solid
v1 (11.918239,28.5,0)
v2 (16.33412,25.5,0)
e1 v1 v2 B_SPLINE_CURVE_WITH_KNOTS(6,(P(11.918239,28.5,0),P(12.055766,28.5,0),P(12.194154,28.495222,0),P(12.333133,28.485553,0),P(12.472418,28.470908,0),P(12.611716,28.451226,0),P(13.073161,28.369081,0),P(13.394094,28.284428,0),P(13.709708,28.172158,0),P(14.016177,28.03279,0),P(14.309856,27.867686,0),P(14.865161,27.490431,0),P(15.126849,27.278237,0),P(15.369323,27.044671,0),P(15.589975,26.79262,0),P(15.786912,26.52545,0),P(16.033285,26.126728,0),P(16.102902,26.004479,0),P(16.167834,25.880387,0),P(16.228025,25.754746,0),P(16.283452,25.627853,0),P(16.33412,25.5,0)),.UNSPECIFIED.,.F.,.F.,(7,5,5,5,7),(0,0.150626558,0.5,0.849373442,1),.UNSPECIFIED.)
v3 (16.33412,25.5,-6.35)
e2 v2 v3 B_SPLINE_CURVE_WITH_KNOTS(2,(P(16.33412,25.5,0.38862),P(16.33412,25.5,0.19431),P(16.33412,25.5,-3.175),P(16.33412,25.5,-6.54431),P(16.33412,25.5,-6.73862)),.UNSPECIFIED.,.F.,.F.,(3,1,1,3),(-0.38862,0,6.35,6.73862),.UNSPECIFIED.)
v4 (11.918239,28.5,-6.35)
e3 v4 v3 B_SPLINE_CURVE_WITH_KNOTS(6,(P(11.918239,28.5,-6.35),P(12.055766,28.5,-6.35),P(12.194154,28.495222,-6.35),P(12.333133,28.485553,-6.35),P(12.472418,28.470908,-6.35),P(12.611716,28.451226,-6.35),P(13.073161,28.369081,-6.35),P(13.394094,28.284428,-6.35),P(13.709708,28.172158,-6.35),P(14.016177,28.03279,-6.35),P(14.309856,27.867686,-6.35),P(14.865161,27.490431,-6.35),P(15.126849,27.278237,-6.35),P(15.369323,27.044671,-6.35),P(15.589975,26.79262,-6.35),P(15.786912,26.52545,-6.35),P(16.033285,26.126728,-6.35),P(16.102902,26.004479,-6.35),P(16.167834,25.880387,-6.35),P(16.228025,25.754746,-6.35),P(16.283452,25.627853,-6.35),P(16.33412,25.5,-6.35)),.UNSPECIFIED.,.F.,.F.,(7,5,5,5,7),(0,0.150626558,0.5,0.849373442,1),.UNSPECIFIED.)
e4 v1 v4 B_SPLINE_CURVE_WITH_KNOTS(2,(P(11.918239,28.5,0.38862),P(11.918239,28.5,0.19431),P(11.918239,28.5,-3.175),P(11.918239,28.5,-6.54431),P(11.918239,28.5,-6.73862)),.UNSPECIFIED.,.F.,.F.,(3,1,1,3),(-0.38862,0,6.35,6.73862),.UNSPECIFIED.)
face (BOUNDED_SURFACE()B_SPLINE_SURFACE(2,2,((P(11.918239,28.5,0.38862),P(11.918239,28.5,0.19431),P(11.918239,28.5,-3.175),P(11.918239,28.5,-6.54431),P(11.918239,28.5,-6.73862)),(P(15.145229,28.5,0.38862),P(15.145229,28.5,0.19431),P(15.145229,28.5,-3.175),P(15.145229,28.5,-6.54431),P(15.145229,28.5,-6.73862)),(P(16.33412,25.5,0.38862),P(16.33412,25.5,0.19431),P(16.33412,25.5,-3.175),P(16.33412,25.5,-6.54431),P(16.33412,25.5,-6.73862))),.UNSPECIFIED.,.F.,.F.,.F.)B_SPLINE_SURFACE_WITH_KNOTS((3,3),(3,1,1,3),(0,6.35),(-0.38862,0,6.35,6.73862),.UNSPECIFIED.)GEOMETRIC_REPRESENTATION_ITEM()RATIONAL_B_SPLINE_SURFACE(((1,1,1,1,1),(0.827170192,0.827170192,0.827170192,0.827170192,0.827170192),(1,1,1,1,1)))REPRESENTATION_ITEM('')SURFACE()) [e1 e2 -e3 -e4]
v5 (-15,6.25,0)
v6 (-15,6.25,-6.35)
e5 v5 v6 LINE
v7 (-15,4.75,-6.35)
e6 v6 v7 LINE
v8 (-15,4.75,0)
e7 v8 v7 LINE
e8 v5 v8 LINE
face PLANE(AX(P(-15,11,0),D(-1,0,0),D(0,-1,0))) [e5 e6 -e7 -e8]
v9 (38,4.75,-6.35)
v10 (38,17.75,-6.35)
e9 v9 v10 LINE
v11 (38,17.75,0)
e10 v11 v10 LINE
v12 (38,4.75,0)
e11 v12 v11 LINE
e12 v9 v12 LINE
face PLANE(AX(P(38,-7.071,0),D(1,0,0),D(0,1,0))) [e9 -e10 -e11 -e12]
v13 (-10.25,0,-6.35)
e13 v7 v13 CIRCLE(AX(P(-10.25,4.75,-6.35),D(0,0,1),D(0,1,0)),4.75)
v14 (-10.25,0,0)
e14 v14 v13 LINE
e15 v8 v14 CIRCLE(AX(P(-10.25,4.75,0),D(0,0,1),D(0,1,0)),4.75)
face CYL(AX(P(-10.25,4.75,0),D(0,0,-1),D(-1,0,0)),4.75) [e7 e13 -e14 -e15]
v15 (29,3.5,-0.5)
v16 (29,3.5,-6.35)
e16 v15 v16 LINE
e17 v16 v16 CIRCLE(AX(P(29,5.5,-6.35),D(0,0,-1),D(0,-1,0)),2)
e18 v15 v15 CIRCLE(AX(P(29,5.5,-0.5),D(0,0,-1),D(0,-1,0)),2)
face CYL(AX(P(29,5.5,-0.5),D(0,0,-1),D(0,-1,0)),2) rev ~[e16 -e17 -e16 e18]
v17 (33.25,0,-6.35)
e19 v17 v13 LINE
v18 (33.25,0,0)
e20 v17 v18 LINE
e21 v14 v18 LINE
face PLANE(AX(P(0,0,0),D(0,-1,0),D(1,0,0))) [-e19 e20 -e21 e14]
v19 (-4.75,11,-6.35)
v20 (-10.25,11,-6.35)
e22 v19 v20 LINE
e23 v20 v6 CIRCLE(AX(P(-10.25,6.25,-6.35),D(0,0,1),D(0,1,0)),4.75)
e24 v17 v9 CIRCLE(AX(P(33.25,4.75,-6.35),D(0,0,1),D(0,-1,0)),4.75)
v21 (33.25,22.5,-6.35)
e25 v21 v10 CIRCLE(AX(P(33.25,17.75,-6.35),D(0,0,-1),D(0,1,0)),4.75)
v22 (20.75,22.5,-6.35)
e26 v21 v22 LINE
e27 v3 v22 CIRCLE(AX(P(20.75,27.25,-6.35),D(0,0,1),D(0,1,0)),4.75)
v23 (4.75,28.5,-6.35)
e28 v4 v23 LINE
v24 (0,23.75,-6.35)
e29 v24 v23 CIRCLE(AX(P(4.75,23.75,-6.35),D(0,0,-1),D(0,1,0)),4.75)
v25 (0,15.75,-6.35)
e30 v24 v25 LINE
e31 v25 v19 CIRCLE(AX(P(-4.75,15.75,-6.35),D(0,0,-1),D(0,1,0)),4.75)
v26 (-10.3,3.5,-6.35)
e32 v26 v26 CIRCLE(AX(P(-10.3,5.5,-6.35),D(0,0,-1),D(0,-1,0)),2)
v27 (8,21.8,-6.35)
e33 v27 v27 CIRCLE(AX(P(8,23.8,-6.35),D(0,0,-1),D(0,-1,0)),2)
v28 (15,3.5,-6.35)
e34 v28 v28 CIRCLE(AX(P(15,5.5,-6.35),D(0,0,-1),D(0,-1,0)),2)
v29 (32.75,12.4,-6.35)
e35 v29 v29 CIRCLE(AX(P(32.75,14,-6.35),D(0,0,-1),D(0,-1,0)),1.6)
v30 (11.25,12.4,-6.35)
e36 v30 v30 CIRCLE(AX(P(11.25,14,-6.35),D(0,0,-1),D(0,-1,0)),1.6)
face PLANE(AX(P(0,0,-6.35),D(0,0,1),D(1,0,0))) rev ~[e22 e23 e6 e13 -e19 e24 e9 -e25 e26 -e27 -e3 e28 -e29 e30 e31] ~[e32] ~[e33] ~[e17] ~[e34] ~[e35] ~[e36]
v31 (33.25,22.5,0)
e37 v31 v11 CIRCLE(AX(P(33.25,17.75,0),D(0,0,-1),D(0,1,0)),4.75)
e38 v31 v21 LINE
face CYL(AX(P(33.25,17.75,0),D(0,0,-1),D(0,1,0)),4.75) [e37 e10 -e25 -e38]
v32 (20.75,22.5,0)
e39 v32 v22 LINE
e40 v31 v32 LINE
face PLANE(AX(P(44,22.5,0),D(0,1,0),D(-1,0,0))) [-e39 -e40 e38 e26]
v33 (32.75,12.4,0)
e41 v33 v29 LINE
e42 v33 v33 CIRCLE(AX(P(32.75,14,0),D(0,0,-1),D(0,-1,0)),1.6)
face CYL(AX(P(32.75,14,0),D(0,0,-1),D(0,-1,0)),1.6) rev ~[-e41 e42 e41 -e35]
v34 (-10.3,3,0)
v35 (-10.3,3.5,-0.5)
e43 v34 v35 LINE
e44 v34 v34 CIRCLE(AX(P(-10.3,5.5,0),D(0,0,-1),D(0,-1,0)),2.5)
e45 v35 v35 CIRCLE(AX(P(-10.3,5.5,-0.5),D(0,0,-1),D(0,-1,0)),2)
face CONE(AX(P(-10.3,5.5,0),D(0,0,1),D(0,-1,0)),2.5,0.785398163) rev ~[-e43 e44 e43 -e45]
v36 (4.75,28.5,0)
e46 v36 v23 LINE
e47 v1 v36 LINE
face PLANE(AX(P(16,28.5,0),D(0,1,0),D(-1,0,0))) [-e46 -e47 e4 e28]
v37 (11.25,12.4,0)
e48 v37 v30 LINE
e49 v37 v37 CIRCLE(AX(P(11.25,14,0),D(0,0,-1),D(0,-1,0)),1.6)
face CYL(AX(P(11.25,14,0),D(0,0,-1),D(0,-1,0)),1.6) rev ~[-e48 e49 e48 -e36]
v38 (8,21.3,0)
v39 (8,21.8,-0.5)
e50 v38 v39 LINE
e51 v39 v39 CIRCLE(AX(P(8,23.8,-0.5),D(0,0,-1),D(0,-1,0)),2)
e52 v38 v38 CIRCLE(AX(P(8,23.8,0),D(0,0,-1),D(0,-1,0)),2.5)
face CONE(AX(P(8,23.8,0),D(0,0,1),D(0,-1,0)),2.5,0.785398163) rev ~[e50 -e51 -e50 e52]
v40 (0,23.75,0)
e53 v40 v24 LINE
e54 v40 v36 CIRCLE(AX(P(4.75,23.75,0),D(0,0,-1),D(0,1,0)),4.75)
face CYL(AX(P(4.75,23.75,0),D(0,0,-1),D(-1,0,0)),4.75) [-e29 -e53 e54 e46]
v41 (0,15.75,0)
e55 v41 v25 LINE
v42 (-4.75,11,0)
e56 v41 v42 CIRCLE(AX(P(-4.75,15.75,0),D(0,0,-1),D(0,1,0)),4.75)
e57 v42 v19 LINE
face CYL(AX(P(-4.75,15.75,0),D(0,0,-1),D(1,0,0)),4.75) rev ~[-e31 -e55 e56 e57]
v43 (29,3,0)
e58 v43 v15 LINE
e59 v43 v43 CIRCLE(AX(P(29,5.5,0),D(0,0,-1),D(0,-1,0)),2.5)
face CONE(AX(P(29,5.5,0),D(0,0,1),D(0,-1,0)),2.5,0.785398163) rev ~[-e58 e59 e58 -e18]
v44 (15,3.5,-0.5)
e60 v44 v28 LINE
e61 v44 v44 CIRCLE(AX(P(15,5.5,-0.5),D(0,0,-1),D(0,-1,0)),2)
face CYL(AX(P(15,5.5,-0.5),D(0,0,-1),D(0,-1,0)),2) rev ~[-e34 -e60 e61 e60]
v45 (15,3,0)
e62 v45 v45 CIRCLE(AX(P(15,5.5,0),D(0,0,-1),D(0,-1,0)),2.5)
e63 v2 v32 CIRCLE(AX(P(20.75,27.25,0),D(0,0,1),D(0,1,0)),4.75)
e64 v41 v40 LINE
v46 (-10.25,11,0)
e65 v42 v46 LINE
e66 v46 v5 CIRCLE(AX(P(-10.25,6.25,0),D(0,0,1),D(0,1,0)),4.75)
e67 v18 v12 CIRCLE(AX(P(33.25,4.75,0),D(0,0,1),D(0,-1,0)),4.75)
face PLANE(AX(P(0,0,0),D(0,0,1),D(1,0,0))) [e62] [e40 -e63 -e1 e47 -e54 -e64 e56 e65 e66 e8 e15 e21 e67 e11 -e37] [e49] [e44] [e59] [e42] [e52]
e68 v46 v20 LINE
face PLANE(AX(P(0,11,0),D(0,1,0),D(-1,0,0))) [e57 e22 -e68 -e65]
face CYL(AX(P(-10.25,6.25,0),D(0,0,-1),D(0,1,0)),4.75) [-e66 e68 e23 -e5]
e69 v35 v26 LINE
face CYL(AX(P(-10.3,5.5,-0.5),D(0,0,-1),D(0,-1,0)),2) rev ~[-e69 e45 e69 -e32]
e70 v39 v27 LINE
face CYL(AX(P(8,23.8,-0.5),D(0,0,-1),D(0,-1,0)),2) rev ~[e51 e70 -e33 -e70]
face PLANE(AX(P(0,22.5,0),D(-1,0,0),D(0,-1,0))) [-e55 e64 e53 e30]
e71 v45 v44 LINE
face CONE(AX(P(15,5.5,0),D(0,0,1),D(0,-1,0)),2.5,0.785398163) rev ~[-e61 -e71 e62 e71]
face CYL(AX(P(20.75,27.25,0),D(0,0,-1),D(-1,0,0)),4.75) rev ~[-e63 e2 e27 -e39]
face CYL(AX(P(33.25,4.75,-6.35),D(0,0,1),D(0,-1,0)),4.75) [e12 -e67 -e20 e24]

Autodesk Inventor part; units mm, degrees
ref_plane "YZ Plane" through (0, 0, 0) normal (1, 0, 0) x (0, 1, 0)
ref_plane "XZ Plane" through (0, 0, 0) normal (0, 1, 0) x (-1, 0, 0)
ref_plane "XY Plane" through (0, 0, 0) normal (0, 0, 1) x (1, 0, 0)
sketch "Sketch1" plane through (0, 0, 0) normal (0, 0, 1) x (1, 0, 0)
  line L0 (0, 0) -> (44, 0)
  line L1 (44, 0) -> (44, 22.5)
  line L2 (44, 22.5) -> (0, 22.5)
  line L3 (0, 22.5) -> (0, 0)
  line L4 (29, 5.5) -> (44, 5.5) construction
  line L5 (15, 5.5) -> (0, 5.5) construction
  line L6 (32.75, 14) -> (44, 14) construction
  line L7 (11.25, 14) -> (0, 14) construction
  line L8 (0, 11) -> (-15, 11)
  line L9 (-15, 11) -> (-15, 0)
  line L10 (-15, 0) -> (0, 0)
  line L11 (0, 0) -> (0, 11)
  line L12 (0, 22.5) -> (16, 22.5)
  line L13 (16, 22.5) -> (16, 28.5)
  line L14 (16, 28.5) -> (0, 28.5)
  line L15 (0, 28.5) -> (0, 22.5)
  line L16 (44, 5.5) -> (44, 22.5)
  point P0 (8, 23.8)
  point P1 (-10.3, 5.5)
  point P2 (-15, 5.5)
  point P3 (8, 28.5)
  dimension "d0" = 14
  dimension "d1" = 21.5
  dimension "d2" = 18.3
  dimension "d3" = 18.3
  dimension "d5" = 7
  dimension "d6" = 44
  dimension "d13" = 22.5
  dimension "d28" = 4.7
  dimension "d43" = 5.5
  dimension "d46" = 4.7
extrude "Extrusion1" add sketch "Sketch1" against normal blind 6.35
hole "Hole1" at (15, 5.5, 0) at (29, 5.5, 0) at (8, 23.8, 0) at (-10.3, 5.5, 0) direction (0, 0, -1) diameter 4 end through all countersink diameter 5 countersink angle 90
sketch "Sketch2" plane through (0, 0, 0) normal (0, 0, 1) x (1, 0, 0)
  line L0 (38, 26.3081) -> (49.0183, 26.3081)
  line L1 (49.0183, 26.3081) -> (49.0183, -7.071)
  line L2 (49.0183, -7.071) -> (38, -7.071)
  line L3 (38, -7.071) -> (38, 26.3081)
  line L4 (44, 0) -> (44, 22.5) projected
  point P0 (0, 0)
  dimension "d29" = 6
extrude "Extrusion2" cut sketch "Sketch2" against normal through all
hole "Hole2" at (11.25, 14, 0) at (32.75, 14, 0) direction (0, 0, -1) diameter 3.2 end through all
fillet "Fillet1" radius 4.75 8 edges at (38, 22.5, -3.175) (16, 28.5, -3.175) (0, 28.5, -3.175) (-15, 11, -3.175) (-15, 0, -3.175) (38, 0, -3.175) (0, 11, -3.175) (16, 22.5, -3.175)
equation "\"d46\" = d28"
properties part number "Hotend Mount"
